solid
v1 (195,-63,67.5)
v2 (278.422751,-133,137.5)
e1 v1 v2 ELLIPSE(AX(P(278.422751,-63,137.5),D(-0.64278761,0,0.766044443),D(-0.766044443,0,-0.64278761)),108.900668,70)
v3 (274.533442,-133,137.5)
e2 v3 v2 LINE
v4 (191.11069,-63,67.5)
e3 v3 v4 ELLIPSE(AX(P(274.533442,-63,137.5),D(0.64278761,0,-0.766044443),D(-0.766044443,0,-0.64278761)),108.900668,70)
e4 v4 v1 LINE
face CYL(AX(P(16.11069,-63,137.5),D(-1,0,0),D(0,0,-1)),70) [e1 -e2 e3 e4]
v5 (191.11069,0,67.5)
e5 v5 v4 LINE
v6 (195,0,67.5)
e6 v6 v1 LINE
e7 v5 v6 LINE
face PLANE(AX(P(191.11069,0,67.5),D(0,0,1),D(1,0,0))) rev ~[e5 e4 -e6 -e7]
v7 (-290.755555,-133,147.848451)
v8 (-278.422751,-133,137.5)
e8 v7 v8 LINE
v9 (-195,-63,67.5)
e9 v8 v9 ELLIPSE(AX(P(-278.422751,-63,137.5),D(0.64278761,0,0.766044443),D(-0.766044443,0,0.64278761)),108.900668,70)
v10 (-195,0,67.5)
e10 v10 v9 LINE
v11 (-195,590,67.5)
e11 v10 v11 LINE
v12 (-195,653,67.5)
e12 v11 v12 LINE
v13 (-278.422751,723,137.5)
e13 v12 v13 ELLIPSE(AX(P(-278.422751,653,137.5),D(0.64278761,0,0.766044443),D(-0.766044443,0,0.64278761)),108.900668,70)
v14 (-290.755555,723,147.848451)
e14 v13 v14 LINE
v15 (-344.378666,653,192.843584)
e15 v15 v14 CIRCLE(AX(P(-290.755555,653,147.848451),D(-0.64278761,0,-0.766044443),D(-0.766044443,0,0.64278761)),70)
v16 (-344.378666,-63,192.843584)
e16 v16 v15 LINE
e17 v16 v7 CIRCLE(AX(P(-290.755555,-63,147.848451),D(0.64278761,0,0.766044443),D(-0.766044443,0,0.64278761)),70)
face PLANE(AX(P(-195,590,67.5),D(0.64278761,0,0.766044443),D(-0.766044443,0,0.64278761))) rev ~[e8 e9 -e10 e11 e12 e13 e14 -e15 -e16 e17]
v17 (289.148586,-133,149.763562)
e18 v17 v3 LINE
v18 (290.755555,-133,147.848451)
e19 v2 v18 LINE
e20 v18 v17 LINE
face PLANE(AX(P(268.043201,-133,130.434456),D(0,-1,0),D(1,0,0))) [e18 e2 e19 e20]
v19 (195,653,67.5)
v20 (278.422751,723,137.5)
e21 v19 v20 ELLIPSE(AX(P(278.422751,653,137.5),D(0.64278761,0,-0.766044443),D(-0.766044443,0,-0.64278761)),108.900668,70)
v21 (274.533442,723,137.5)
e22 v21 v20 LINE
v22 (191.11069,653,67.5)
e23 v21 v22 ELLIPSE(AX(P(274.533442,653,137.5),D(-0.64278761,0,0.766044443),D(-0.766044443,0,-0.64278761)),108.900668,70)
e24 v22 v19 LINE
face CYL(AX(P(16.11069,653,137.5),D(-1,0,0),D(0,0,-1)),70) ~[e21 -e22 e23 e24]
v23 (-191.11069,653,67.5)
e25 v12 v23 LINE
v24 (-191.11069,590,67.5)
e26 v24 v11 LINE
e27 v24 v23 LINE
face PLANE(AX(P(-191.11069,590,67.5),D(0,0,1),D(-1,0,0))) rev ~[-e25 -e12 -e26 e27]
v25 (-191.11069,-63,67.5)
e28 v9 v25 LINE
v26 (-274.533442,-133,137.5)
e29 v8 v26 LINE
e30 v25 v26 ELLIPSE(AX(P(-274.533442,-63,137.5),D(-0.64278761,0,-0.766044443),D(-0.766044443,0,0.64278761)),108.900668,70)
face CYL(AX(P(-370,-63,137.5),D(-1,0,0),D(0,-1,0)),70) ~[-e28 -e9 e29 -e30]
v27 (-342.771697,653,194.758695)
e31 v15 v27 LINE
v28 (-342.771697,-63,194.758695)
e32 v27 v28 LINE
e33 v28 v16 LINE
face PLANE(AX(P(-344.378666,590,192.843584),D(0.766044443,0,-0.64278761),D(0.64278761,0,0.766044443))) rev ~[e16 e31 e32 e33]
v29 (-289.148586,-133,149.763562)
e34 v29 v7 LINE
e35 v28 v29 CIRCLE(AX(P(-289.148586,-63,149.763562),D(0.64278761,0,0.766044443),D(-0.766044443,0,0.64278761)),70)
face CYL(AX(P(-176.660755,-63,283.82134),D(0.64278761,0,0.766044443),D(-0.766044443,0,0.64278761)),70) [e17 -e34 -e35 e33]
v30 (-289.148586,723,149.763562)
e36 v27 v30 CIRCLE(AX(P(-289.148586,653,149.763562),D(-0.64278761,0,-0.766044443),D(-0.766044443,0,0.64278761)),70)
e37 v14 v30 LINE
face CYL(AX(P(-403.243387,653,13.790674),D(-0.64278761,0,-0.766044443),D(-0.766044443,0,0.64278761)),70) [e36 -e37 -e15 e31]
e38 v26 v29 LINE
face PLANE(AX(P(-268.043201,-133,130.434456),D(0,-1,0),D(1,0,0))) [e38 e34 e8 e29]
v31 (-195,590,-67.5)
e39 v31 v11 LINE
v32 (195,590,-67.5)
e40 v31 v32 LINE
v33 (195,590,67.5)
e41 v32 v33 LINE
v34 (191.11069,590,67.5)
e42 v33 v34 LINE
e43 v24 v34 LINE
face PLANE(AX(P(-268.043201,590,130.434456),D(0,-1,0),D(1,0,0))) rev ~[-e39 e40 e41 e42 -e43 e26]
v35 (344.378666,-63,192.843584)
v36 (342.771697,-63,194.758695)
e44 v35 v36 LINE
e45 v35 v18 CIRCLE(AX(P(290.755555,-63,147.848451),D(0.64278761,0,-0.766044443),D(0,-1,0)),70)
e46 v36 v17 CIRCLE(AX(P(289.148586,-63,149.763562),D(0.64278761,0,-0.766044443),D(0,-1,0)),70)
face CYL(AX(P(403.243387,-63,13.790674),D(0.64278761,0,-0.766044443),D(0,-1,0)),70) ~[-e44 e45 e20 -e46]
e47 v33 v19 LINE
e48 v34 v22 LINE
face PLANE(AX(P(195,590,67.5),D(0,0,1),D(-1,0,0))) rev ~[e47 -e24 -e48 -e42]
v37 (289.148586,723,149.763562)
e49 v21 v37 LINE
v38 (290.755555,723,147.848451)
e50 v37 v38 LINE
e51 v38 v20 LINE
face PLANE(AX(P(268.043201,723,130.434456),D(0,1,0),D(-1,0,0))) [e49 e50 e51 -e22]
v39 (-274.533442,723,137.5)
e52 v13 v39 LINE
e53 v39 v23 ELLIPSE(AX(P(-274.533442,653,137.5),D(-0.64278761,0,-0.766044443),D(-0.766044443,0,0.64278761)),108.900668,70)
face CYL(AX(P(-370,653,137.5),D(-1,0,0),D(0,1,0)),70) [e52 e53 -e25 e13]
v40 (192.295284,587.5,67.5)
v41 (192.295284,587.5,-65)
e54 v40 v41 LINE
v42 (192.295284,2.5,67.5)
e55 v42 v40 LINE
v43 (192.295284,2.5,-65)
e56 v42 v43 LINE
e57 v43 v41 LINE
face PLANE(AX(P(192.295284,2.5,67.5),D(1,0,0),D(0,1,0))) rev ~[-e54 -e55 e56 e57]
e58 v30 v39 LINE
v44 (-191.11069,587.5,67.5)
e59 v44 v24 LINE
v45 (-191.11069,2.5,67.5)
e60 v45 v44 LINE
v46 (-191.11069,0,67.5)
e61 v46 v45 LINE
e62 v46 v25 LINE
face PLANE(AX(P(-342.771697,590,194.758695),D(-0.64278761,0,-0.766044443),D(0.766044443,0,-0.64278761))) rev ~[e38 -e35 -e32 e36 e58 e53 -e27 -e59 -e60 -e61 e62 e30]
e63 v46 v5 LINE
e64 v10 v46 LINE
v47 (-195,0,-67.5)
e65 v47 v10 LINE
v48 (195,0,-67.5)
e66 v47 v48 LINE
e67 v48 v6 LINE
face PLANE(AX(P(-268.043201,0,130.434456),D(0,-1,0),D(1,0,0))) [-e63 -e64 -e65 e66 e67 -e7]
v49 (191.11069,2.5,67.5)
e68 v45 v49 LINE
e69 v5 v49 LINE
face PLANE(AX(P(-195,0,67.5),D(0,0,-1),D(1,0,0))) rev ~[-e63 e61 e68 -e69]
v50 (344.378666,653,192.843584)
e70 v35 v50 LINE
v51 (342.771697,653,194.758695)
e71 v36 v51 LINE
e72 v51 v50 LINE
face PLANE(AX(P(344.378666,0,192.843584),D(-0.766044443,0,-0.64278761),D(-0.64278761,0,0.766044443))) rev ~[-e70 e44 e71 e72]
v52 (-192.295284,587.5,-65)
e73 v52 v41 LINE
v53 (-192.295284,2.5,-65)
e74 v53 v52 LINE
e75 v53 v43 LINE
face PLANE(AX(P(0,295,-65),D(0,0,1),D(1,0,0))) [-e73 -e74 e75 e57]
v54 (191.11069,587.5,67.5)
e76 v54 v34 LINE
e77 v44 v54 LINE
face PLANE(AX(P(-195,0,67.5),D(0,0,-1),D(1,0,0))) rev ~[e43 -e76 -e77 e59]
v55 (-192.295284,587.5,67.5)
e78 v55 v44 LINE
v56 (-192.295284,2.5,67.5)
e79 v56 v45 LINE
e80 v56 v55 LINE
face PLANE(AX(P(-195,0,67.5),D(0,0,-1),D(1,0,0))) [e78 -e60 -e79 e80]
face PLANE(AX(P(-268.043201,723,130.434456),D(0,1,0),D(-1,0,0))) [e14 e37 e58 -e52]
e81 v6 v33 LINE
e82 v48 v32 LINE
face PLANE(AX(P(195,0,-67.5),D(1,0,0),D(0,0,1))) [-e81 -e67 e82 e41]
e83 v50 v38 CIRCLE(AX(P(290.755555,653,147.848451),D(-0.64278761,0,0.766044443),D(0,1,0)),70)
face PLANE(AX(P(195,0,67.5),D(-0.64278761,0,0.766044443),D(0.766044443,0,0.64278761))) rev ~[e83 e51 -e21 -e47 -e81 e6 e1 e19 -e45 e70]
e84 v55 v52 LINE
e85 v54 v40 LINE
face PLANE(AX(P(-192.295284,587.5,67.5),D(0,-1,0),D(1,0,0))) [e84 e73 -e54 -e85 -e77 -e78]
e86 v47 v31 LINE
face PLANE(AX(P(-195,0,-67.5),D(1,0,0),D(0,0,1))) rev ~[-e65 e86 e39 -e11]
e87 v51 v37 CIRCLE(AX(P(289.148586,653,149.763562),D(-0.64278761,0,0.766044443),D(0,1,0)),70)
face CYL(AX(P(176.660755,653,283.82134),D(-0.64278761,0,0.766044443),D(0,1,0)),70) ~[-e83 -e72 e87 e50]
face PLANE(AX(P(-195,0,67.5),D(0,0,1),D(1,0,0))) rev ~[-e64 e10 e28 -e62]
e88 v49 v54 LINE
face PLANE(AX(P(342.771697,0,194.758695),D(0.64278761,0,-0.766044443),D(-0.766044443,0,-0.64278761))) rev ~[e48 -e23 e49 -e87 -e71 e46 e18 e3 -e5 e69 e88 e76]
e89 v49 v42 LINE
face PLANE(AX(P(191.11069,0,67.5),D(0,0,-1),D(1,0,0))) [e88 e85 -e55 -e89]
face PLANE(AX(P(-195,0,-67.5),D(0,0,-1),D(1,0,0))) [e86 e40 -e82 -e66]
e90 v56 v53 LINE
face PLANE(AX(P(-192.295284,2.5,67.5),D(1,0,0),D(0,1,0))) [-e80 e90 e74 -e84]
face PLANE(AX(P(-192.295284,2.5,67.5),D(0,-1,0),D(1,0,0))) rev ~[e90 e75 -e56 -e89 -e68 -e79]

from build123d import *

# Parameters (mm, degrees)
F0_W         = 390
F0_H         = 135
F1_DEPTH     = 590
F2_W         = 384.5905684095
F2_H         = 585
F3_DEPTH     = 132.5
F5_DEPTH     = 590
F7_DEPTH     = 133
F8_T1_DEPTH  = 352.5
F8_T3_DEPTH  = 353.8893095672
F8_T5_DEPTH  = 353.8893095672
F8_T7_DEPTH  = 352.5
F10_DEPTH    = 133
F11_T1_DEPTH = 352.5
F11_T3_DEPTH = 353.8893095672
F11_T5_DEPTH = 353.8893095672
F11_T7_DEPTH = 352.5


# Not quite as in the source:
# - a fillet or chamfer that OpenCascade refuses, or shapes differently, is made with other operations: its cross-section is extruded or revolved along the edge and cut away or added


with BuildPart() as f1:
    # F0 (on Front) → F1 (new body)
    with BuildSketch(Plane.XZ):
        Rectangle(F0_W, F0_H)
    extrude(amount=-F1_DEPTH)

    # F2 (on face) → F3 (cut)
    with BuildSketch(Plane.XY.offset(67.5)):
        with Locations((0, 295)):
            Rectangle(F2_W, F2_H)
    extrude(amount=-F3_DEPTH, mode=Mode.SUBTRACT)

    # F4 (on face) → F5 (join)
    with BuildSketch(Plane.XZ):
        Polygon((-195, 67.5), (-191.1106904328, 67.5), (-342.771697384, 194.7586949967), (-344.3786664082, 192.8435838889), align=None)
        Polygon((191.1106904328, 67.5), (195, 67.5), (344.3786664082, 192.8435838889), (342.771697384, 194.7586949967), align=None)
    extrude(amount=-F5_DEPTH)

    # F6 (on face) → F7 (join)
    with BuildSketch(Plane(origin=(0, 590, 0), x_dir=(-1, 0, 0), z_dir=(0, 1, 0))):
        Polygon((195, 67.5), (344.3786664082, 192.8435838889), (342.771697384, 194.7586949967), (191.1106904328, 67.5), align=None)
        Polygon((-344.3786664082, 192.8435838889), (-195, 67.5), (-191.1106904328, 67.5), (-342.771697384, 194.7586949967), align=None)
    extrude(amount=F7_DEPTH)

    # F8: fillet of radius 70 on 4 edges, made by hand

    # F8_s2 → F8_t1 (cut)
    with BuildSketch(Plane(origin=(-66.762759706, 0, 79.5647587312), x_dir=(0, 1, 0), z_dir=(0.6427876097, 0, -0.7660444431))):
        with BuildLine():
            ThreePointArc((723, 317.766830062), (702.4974746831, 367.2643047451), (653, 387.766830062))
            Line((653, 387.766830062), (723, 387.766830062))
            Line((723, 387.766830062), (723, 317.766830062))
        make_face()
    extrude(amount=F8_T1_DEPTH, mode=Mode.SUBTRACT)

    # F8_s4 → F8_t3 (cut)
    with BuildSketch(Plane.YZ.offset(16.1106904328)):
        with BuildLine():
            ThreePointArc((653, 67.5), (702.4974746831, 88.0025253169), (723, 137.5))
            Line((723, 137.5), (723, 67.5))
            Line((723, 67.5), (653, 67.5))
        make_face()
    extrude(amount=F8_T3_DEPTH, mode=Mode.SUBTRACT)

    # F8_s6 → F8_t5 (cut)
    with BuildSketch(Plane.YZ.offset(-370)):
        with BuildLine():
            ThreePointArc((723, 137.5), (702.4974746831, 88.0025253169), (653, 67.5))
            Line((653, 67.5), (723, 67.5))
            Line((723, 67.5), (723, 137.5))
        make_face()
    extrude(amount=F8_T5_DEPTH, mode=Mode.SUBTRACT)

    # F8_s8 → F8_t7 (cut)
    with BuildSketch(Plane(origin=(-159.8198727085, 0, -190.4659074683), x_dir=(0, 1, 0), z_dir=(0.6427876097, 0, 0.7660444431))):
        with BuildLine():
            ThreePointArc((653, 387.766830062), (702.4974746831, 367.2643047451), (723, 317.766830062))
            Line((723, 317.766830062), (723, 387.766830062))
            Line((723, 387.766830062), (653, 387.766830062))
        make_face()
    extrude(amount=F8_T7_DEPTH, mode=Mode.SUBTRACT)

    # F9 (on face) → F10 (join)
    with BuildSketch(Plane.XZ):
        Polygon((342.771697384, 194.7586949967), (191.1106904328, 67.5), (195, 67.5), (344.3786664082, 192.8435838889), align=None)
        Polygon((-195, 67.5), (-191.1106904328, 67.5), (-342.771697384, 194.7586949967), (-344.3786664082, 192.8435838889), align=None)
    extrude(amount=F10_DEPTH)

    # F11: fillet of radius 70 on 4 edges, made by hand

    # F11_s2 → F11_t1 (cut)
    with BuildSketch(Plane(origin=(66.762759706, 0, 79.5647587312), x_dir=(0, 1, 0), z_dir=(-0.6427876097, 0, -0.7660444431))):
        with BuildLine():
            ThreePointArc((-63, -387.766830062), (-112.4974746831, -367.2643047451), (-133, -317.766830062))
            Line((-133, -317.766830062), (-133, -387.766830062))
            Line((-133, -387.766830062), (-63, -387.766830062))
        make_face()
    extrude(amount=F11_T1_DEPTH, mode=Mode.SUBTRACT)

    # F11_s4 → F11_t3 (cut)
    with BuildSketch(Plane.YZ.offset(-370)):
        with BuildLine():
            ThreePointArc((-133, 137.5), (-112.4974746831, 88.0025253169), (-63, 67.5))
            Line((-63, 67.5), (-133, 67.5))
            Line((-133, 67.5), (-133, 137.5))
        make_face()
    extrude(amount=F11_T3_DEPTH, mode=Mode.SUBTRACT)

    # F11_s6 → F11_t5 (cut)
    with BuildSketch(Plane.YZ.offset(16.1106904328)):
        with BuildLine():
            ThreePointArc((-63, 67.5), (-112.4974746831, 88.0025253169), (-133, 137.5))
            Line((-133, 137.5), (-133, 67.5))
            Line((-133, 67.5), (-63, 67.5))
        make_face()
    extrude(amount=F11_T5_DEPTH, mode=Mode.SUBTRACT)

    # F11_s8 → F11_t7 (cut)
    with BuildSketch(Plane(origin=(159.8198727085, 0, -190.4659074683), x_dir=(0, 1, 0), z_dir=(-0.6427876097, 0, 0.7660444431))):
        with BuildLine():
            ThreePointArc((-133, -317.766830062), (-112.4974746831, -367.2643047451), (-63, -387.766830062))
            Line((-63, -387.766830062), (-133, -387.766830062))
            Line((-133, -387.766830062), (-133, -317.766830062))
        make_face()
    extrude(amount=F11_T7_DEPTH, mode=Mode.SUBTRACT)


solid = f1.part
